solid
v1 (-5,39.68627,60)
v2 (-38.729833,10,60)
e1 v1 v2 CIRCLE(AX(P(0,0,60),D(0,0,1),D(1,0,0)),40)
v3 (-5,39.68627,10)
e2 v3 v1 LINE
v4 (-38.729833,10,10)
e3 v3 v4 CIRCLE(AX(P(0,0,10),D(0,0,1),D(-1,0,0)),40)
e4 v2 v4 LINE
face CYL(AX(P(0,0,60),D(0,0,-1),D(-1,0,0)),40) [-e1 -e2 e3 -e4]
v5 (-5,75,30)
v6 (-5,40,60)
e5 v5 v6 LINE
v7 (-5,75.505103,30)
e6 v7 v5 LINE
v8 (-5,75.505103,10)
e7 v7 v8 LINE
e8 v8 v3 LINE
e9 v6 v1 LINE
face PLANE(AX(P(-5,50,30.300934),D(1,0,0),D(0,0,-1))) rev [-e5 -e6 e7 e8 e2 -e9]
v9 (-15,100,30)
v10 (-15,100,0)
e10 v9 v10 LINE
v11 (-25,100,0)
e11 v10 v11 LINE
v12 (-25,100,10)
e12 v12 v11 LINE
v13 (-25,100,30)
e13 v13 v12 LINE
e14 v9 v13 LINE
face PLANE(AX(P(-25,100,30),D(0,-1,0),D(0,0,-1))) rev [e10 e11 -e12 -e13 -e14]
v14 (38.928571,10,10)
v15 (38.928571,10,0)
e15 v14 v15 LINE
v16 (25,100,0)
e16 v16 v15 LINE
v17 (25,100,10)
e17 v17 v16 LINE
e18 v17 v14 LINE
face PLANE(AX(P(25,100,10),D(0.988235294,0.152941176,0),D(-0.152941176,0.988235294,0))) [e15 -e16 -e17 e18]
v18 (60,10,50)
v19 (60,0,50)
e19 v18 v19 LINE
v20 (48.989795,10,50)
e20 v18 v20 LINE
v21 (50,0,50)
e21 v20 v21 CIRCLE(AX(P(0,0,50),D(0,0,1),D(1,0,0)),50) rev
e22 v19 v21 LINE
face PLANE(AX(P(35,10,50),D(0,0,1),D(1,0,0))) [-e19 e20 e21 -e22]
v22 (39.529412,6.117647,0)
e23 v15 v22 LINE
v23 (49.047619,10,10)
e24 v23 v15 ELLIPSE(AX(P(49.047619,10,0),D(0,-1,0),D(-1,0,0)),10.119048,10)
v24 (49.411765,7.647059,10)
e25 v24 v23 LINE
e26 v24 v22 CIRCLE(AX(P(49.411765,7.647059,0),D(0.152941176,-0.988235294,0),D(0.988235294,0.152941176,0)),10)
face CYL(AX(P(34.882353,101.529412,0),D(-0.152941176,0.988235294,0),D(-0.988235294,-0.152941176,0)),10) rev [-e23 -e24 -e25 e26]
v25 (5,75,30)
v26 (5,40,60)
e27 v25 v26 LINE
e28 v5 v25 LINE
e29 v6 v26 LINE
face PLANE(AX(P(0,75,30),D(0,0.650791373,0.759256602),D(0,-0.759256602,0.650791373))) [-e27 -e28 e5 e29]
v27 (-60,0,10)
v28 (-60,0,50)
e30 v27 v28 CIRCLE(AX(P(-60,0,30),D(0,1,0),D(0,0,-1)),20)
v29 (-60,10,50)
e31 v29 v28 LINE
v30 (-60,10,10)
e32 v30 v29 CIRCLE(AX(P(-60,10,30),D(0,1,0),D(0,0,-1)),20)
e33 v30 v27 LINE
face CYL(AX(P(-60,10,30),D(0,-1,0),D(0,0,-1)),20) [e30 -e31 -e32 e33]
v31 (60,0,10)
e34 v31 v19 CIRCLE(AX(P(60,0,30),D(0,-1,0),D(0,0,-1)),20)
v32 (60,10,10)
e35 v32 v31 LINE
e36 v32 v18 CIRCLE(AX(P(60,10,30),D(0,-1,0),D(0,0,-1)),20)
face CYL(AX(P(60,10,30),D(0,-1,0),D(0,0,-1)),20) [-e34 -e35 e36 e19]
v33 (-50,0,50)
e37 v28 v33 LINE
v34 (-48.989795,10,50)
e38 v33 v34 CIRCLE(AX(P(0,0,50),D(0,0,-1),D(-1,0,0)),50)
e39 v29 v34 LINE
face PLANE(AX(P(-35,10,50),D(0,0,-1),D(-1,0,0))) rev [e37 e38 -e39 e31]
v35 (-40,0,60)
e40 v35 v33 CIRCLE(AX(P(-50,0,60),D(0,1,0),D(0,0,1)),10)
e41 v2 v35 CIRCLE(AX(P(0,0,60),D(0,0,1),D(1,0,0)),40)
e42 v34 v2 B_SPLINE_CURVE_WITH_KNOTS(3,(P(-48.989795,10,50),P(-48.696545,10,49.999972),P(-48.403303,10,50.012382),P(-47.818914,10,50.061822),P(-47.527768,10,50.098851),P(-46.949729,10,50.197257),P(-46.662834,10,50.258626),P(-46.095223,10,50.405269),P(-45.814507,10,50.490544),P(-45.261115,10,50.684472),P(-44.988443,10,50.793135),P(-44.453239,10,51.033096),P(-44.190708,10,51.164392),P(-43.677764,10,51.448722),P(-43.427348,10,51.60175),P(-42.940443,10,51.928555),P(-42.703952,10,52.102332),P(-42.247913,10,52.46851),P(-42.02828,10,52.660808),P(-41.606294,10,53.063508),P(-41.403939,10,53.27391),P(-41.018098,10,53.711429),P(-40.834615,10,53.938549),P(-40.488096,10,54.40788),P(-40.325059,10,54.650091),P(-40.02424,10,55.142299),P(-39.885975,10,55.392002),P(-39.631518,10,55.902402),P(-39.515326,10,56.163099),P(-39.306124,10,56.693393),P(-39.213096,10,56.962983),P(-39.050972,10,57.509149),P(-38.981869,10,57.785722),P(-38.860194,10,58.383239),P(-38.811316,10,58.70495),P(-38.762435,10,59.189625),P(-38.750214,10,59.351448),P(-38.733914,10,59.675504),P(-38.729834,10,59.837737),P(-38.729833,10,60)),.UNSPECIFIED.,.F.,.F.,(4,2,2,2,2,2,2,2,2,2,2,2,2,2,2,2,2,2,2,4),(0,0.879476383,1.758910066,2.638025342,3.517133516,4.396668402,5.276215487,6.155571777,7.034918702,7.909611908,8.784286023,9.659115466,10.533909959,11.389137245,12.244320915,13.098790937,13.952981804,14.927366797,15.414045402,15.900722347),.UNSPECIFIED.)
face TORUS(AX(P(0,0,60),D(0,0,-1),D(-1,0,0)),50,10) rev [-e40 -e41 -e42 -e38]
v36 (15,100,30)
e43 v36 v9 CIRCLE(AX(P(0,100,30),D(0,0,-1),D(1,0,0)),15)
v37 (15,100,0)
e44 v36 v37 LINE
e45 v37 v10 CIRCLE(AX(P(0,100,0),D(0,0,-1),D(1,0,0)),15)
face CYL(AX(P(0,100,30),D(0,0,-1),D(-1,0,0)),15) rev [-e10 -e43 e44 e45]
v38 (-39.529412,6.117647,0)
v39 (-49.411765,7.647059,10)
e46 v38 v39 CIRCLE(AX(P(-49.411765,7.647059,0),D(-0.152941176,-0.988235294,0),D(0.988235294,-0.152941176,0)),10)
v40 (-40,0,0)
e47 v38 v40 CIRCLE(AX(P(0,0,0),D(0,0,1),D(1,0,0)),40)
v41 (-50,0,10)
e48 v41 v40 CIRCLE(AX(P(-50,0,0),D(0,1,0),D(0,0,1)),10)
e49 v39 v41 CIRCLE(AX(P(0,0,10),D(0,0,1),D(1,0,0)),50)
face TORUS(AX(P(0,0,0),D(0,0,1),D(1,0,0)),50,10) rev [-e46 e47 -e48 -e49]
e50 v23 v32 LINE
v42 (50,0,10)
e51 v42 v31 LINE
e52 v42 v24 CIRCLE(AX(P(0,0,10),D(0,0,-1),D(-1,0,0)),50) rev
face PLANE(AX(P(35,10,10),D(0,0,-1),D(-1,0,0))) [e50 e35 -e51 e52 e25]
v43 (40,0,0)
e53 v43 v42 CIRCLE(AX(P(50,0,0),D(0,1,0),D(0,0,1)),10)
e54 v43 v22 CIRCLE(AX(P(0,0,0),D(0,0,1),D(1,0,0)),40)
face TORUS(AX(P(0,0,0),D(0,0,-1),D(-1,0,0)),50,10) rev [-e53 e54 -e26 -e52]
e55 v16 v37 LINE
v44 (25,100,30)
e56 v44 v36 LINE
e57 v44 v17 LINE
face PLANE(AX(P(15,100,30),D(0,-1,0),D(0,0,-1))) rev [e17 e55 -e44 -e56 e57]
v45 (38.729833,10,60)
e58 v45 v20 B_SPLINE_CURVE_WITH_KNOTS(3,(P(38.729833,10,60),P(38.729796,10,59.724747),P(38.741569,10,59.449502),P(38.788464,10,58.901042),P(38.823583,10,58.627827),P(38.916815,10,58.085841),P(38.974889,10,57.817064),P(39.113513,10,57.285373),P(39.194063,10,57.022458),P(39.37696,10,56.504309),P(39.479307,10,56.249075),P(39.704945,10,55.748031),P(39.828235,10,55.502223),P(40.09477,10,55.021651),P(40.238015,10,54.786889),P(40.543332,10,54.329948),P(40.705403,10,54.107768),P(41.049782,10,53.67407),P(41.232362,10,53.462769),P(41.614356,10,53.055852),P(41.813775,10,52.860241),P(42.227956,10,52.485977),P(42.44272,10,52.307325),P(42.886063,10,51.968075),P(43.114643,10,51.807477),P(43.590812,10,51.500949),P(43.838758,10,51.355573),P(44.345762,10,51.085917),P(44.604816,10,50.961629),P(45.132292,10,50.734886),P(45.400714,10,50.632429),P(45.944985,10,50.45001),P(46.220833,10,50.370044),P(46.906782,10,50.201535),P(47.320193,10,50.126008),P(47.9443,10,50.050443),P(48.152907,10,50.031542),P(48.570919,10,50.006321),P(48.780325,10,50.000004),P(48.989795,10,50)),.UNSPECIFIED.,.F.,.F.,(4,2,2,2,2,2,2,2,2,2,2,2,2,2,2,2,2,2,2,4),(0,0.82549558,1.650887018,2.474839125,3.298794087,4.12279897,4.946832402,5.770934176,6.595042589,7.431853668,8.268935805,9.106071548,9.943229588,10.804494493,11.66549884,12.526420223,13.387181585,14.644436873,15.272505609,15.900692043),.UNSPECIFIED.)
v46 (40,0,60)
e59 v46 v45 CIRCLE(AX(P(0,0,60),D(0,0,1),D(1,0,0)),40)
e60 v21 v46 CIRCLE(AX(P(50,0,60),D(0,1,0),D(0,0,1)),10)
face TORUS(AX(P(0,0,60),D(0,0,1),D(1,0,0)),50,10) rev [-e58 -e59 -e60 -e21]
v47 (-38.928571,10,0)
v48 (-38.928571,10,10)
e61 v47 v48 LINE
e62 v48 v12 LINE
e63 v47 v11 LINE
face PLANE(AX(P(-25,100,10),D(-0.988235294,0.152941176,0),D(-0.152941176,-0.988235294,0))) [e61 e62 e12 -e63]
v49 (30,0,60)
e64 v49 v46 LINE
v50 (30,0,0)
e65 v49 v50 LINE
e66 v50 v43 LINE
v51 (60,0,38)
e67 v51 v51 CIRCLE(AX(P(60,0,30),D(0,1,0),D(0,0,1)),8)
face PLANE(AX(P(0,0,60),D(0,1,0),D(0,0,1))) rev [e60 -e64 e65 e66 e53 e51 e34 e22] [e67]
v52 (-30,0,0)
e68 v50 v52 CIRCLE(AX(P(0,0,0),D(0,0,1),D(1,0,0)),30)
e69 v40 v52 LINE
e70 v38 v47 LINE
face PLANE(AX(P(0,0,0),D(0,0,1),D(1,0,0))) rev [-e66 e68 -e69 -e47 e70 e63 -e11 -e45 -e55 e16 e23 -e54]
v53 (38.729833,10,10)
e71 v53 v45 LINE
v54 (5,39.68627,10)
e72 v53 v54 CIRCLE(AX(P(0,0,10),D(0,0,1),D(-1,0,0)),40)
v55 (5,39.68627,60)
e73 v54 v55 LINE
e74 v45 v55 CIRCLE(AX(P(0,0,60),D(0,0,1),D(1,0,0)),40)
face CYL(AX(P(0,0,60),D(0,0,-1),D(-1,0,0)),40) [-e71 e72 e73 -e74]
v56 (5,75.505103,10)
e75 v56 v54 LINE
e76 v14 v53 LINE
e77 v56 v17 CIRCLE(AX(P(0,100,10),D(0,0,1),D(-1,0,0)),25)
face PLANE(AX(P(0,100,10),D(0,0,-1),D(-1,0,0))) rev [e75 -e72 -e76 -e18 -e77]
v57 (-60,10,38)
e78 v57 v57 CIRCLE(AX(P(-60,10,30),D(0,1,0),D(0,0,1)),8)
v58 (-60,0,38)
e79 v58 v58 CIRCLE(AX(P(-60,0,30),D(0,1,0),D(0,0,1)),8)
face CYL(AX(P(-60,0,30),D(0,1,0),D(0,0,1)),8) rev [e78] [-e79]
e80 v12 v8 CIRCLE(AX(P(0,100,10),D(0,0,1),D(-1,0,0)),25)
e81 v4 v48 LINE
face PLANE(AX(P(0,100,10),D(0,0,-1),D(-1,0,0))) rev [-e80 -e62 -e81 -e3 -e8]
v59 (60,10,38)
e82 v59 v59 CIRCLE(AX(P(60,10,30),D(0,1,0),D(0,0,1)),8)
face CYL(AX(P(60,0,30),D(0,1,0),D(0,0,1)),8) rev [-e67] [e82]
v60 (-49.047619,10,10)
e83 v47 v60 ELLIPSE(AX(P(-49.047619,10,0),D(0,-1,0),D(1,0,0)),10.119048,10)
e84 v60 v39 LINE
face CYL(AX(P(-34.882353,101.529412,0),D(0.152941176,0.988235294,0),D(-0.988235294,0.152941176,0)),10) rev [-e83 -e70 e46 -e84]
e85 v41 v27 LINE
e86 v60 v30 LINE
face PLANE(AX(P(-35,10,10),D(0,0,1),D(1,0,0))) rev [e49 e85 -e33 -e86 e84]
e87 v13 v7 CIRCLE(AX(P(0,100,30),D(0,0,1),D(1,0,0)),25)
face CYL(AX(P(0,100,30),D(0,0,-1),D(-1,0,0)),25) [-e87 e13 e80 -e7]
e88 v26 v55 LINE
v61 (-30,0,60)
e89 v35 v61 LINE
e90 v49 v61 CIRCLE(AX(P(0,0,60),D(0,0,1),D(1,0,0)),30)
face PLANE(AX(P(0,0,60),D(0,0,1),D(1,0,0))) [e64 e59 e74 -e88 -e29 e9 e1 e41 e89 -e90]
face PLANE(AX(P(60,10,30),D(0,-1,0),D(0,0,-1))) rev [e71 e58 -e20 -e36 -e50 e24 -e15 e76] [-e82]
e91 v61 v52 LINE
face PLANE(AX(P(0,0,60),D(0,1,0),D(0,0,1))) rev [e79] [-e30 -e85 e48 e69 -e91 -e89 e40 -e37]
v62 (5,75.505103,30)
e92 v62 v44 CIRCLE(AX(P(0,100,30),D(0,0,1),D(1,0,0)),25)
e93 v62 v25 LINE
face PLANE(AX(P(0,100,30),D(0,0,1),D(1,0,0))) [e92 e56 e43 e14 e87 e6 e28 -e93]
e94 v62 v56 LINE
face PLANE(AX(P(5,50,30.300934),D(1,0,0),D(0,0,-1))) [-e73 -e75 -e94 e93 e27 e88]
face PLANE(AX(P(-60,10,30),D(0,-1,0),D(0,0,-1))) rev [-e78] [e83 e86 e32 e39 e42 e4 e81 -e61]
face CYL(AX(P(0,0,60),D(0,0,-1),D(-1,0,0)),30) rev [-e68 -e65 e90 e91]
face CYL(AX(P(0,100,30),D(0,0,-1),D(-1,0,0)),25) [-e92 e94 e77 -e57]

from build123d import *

# Parameters (mm, degrees)
BOSS_EXTRUDE1_DEPTH  = 60
BOSS_EXTRUDE2_DEPTH  = 30
BOSS_EXTRUDE3_DEPTH  = 10
BOSS_EXTRUDE4_DEPTH  = 10
FILLET1_R            = 10
FILLET1_OF_MIRROR2_R = 10
SKETCH13_R           = 8
CUT_EXTRUDE1_DEPTH   = 135.53624053
RIB1_START           = -5
RIB1_DEPTH           = 10


with BuildPart() as part:
    # Sketch2 → Boss-Extrude1 (new body)
    with BuildSketch(Plane.XY):
        with BuildLine():
            ThreePointArc((-30, 0), (-21.213203436, 21.213203436), (0, 30))
            Line((0, 30), (0, 40))
            ThreePointArc((0, 40), (-28.284271247, 28.284271247), (-40, 0))
            Line((-40, 0), (-30, 0))
        make_face()
        with BuildLine():
            Line((0, 40), (0, 30))
            ThreePointArc((0, 30), (21.213203436, 21.213203436), (30, 0))
            Line((30, 0), (40, 0))
            ThreePointArc((40, 0), (28.284271247, 28.284271247), (0, 40))
        make_face()
    extrude(amount=BOSS_EXTRUDE1_DEPTH)



with BuildPart() as body_2:
    # Sketch2<3> → Boss-Extrude2 (new body)
    with BuildSketch(Plane.XY):
        with BuildLine():
            Line((-25, 100), (-15, 100))
            ThreePointArc((-15, 100), (0, 85), (15, 100))
            Line((15, 100), (25, 100))
            ThreePointArc((25, 100), (0, 75), (-25, 100))
        make_face()
    extrude(amount=BOSS_EXTRUDE2_DEPTH)


with BuildPart() as part_1:
    add(part.part)

    add(body_2.part)  # Boss-Extrude3 merges body 2
    # Sketch8 → Boss-Extrude3 (add)
    with BuildSketch(Plane(origin=(0, 0, 0), x_dir=(-1, 0, 0), z_dir=(0, 0, -1))):
        with BuildLine():
            Line((-25, 100), (-39.529411765, 6.117647059))
            ThreePointArc((-39.529411765, 6.117647059), (0, 40), (39.529411765, 6.117647059))
            Line((39.529411765, 6.117647059), (25, 100))
            ThreePointArc((25, 100), (0, 75), (-25, 100))
        make_face()
    extrude(amount=-BOSS_EXTRUDE3_DEPTH)

    # Sketch10 → Boss-Extrude4 (add)
    with BuildSketch(Plane.XZ):
        with BuildLine():
            Line((35, 50), (60, 50))
            ThreePointArc((60, 50), (80, 30), (60, 10))
            Line((60, 10), (35, 10))
            Line((35, 10), (35, 50))
        make_face()
    boss_extrude4 = extrude(amount=-BOSS_EXTRUDE4_DEPTH)

    # Fillet1
    fillet1_edges = [part_1.edges().sort_by_distance(p)[0] for p in [
        (39.228991597, 8.058823529, 10),
        (39.88217942, 3.067859955, 10),
        (39.681187851, 5.040171699, 50),
    ]]
    fillet(fillet1_edges, radius=FILLET1_R - 0.0001)  # a hair under: the kernel refuses the full size

    # Mirror2: Boss-Extrude4 across plane
    add(boss_extrude4.mirror(Plane(origin=(0, 0, 0), x_dir=(0, 0, 1), z_dir=(1, 0, 0))))

    # Fillet1 of Mirror2
    fillet1_of_mirror2_edges = [part_1.edges().sort_by_distance(p)[0] for p in [
        (-39.228991597, 8.058823529, 10),
        (-39.88217942, 3.067859955, 10),
        (-39.681187851, 5.040171699, 50),
    ]]
    fillet(fillet1_of_mirror2_edges, radius=FILLET1_OF_MIRROR2_R - 0.0001)  # a hair under: the kernel refuses the full size

    # Sketch13 → Cut-Extrude1 (cut, through all)
    with BuildSketch(Plane(origin=(0, 10, 0), x_dir=(1, 0, 0), z_dir=(0, 1, 0))):
        with Locations(Location((60, -30, 0), (0, 0, 270))):
            Circle(SKETCH13_R)
        with Locations(Location((-60, -30, 0), (0, 0, 270))):
            Circle(SKETCH13_R)
    extrude(amount=-CUT_EXTRUDE1_DEPTH, mode=Mode.SUBTRACT)

    # Rib1: read off the stored shape, not the designer's step
    # Rib1 outline → Rib1 (add)
    with BuildSketch(Plane(origin=(0, 0, 0), x_dir=(0, 0, -1), z_dir=(1, 0, 0)).offset(RIB1_START)):
        Polygon((-60, 40), (-60, 39.686269666), (-10, 39.686269666), (-10, 75.505102572), (-30, 75.505102572), (-30, 75), align=None)
    extrude(amount=RIB1_DEPTH)


solid = part_1.part
